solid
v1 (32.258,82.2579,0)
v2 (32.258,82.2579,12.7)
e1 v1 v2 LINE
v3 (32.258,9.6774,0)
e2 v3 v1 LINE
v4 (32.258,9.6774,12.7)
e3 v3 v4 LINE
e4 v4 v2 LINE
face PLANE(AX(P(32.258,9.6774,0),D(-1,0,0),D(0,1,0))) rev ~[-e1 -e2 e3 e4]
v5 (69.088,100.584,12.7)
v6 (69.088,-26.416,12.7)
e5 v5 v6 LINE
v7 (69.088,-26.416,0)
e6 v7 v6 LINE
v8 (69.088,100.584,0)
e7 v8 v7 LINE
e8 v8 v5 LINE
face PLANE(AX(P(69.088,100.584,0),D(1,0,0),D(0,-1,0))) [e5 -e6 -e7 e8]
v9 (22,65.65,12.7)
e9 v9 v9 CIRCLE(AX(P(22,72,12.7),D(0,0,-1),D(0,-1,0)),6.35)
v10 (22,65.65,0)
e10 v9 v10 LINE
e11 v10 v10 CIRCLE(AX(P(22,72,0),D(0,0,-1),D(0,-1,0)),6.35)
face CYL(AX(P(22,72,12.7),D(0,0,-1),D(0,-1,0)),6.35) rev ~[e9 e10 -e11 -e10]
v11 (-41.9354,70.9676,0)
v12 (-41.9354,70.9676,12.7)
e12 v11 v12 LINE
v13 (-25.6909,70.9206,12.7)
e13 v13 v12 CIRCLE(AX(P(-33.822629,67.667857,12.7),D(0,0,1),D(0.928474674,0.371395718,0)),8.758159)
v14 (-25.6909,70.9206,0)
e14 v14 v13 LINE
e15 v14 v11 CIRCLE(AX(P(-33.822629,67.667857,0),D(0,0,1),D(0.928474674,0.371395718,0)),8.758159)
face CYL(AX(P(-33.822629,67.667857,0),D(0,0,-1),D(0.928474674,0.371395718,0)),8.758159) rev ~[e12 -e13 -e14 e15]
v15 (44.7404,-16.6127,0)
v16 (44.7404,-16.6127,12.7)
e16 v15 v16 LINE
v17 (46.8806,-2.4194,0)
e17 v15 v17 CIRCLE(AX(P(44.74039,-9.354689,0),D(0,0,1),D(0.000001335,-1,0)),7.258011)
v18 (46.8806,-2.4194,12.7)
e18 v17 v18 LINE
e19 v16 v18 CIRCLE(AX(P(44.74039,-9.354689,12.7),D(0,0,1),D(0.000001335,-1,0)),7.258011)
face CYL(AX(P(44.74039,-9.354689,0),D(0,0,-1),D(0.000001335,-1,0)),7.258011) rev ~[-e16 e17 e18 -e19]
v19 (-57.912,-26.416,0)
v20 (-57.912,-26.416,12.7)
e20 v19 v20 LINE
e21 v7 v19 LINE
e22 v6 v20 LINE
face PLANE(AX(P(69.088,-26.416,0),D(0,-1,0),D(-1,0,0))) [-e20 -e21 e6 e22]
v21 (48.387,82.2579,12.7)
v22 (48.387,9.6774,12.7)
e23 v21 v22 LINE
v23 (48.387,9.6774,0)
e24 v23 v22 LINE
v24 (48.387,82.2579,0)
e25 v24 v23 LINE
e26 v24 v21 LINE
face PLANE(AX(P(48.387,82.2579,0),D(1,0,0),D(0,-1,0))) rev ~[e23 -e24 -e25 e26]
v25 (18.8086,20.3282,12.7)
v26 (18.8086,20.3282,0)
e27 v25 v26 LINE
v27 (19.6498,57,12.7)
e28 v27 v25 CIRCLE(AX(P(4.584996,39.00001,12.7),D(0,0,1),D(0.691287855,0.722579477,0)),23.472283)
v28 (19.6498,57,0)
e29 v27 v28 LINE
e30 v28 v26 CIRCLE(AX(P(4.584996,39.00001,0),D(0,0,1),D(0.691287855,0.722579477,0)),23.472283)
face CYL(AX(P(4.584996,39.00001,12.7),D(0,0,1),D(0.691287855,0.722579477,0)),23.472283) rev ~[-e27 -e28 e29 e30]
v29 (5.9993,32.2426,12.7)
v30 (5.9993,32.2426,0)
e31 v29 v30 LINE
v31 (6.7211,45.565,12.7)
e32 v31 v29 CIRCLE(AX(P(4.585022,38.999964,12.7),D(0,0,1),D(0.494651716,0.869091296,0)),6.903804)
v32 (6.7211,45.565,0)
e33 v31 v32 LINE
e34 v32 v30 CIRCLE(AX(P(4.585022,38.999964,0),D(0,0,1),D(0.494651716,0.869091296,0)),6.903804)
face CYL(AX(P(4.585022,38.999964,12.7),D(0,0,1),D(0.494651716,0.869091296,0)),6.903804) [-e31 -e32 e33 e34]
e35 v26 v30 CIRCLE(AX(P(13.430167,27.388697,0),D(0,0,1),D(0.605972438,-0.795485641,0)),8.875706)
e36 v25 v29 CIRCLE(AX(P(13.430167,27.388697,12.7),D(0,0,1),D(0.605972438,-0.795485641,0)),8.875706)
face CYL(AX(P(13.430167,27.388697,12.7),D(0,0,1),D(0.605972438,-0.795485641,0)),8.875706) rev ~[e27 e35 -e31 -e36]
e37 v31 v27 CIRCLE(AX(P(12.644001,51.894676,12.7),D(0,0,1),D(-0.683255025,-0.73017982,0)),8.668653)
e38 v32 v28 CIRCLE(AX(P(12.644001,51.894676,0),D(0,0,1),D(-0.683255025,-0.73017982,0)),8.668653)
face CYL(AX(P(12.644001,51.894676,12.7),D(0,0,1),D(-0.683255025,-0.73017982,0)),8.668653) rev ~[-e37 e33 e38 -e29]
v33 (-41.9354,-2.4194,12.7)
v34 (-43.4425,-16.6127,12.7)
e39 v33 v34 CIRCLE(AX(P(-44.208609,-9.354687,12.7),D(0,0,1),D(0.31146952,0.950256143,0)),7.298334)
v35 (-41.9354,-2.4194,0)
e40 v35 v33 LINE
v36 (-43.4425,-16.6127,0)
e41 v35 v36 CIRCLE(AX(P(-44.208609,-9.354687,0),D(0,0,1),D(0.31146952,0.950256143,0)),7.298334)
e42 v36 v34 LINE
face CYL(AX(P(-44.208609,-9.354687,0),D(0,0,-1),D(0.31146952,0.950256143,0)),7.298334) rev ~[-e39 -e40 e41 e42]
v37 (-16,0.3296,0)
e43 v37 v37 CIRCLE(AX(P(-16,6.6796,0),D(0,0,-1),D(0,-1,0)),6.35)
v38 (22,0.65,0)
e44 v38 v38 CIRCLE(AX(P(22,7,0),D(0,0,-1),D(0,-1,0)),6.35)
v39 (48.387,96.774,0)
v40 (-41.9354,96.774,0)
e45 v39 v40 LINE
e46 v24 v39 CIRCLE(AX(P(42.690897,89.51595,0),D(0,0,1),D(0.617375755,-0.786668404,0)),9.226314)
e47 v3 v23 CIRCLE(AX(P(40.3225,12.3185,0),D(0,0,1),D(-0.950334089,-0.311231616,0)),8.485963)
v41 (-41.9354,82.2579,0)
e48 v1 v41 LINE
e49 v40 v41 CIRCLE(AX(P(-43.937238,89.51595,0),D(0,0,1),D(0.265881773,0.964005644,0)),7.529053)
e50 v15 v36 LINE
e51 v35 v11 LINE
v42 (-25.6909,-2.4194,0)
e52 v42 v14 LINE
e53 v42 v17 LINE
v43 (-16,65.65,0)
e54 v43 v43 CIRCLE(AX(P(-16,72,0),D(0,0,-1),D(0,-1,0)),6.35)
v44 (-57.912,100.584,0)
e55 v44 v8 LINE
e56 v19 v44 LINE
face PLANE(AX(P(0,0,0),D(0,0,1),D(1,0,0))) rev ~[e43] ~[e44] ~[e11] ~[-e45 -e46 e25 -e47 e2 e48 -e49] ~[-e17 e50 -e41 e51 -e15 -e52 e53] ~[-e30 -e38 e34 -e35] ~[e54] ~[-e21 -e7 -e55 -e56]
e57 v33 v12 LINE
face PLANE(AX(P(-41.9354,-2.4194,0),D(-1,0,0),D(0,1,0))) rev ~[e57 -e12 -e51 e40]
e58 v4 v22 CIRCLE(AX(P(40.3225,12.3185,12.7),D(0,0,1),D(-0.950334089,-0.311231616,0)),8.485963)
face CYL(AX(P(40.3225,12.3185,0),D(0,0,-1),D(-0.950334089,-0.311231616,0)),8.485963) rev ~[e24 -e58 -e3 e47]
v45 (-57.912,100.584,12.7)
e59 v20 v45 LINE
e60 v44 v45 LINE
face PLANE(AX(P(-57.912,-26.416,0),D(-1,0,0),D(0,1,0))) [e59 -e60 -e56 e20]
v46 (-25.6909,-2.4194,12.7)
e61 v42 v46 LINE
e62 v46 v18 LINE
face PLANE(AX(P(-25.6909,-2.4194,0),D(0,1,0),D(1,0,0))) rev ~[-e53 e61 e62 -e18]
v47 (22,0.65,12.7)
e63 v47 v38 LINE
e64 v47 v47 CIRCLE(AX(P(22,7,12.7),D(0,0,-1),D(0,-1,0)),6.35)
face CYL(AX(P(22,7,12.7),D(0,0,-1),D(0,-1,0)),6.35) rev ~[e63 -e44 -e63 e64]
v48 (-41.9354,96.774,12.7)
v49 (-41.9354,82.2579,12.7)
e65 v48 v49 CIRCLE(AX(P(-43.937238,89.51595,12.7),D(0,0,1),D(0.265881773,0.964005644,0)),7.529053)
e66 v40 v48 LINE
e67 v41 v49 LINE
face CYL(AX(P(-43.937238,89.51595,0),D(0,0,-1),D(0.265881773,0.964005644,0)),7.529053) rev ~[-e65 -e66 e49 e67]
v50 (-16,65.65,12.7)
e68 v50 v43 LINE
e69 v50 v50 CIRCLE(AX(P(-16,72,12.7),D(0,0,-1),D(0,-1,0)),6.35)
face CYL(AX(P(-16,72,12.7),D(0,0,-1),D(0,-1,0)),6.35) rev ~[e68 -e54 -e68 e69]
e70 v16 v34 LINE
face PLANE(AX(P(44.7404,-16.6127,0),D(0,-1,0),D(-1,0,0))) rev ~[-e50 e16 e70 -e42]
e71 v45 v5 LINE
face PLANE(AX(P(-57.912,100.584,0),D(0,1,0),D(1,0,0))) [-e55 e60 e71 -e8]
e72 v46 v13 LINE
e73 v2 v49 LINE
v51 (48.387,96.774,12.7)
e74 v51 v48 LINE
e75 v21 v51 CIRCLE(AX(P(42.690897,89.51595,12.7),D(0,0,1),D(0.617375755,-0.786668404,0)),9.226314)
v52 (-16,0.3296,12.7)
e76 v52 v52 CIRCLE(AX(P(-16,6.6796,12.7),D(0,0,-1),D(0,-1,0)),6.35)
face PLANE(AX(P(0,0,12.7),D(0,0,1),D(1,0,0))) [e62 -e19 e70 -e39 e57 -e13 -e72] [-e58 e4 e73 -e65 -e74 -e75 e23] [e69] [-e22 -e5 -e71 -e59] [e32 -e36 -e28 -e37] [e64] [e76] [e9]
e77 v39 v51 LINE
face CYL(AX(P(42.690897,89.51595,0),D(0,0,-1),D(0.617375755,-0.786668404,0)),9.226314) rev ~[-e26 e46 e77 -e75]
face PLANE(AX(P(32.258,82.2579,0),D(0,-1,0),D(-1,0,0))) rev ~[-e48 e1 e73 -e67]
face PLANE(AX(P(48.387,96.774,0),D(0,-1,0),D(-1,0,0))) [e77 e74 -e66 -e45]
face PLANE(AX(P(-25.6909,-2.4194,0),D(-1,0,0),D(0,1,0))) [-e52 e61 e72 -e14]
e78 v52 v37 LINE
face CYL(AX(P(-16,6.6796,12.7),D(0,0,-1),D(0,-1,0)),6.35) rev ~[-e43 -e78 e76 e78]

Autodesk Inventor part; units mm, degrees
ref_plane "YZ Plane" through (0, 0, 0) normal (1, 0, 0) x (0, 1, 0)
ref_plane "XZ Plane" through (0, 0, 0) normal (0, 1, 0) x (-1, 0, 0)
ref_plane "XY Plane" through (0, 0, 0) normal (0, 0, 1) x (1, 0, 0)
sketch "Sketch1" plane through (0, 0, 0) normal (0, 0, 1) x (1, 0, 0)
  line L0 (44.7404, -16.6127) -> (-43.4425, -16.6127)
  arc A0 (44.7404, -16.6127) -> (46.8806, -2.4194) centre (44.7404, -9.3547) ccw
  arc A1 (-41.9354, -2.4194) -> (-43.4425, -16.6127) centre (-44.2086, -9.3547) ccw
  line L1 (48.387, 82.2579) -> (48.387, 9.6774)
  arc A2 (-25.6909, 70.9206) -> (-41.9354, 70.9676) centre (-33.8226, 67.6679) ccw
  line L2 (-41.9354, -2.4194) -> (-41.9354, 70.9676)
  line L3 (-25.6909, -2.4194) -> (-25.6909, 70.9206)
  line L4 (-25.6909, -2.4194) -> (46.8806, -2.4194)
  line L5 (-57.912, 100.584) -> (69.088, 100.584)
  line L6 (69.088, 100.584) -> (69.088, -26.416)
  line L7 (69.088, -26.416) -> (-57.912, -26.416)
  line L8 (-57.912, -26.416) -> (-57.912, 100.584)
  arc A3 (32.258, 9.6774) -> (48.387, 9.6774) centre (40.3225, 12.3185) ccw
  arc A4 (48.387, 82.2579) -> (48.387, 96.774) centre (42.691, 89.5159) ccw
  line L9 (32.258, 82.2579) -> (-41.9354, 82.2579)
  line L10 (48.387, 96.774) -> (-41.9354, 96.774)
  line L11 (32.258, 9.6774) -> (32.258, 82.2579)
  arc A5 (-41.9354, 96.774) -> (-41.9354, 82.2579) centre (-43.9372, 89.5159) ccw
  point P0 (0, 0)
  dimension "d0" = 127
  dimension "d1" = 127
extrude "Extrusion1" add sketch "Sketch1" along normal blind 12.7
sketch "Sketch2" plane through (0, 0, 12.7) normal (0, 0, 1) x (1, 0, 0)
  circle A0 centre (22, 7) radius 6.35
  circle A1 centre (-16, 6.6796) radius 6.35
  circle A2 centre (-16, 72) radius 6.35
  circle A3 centre (22, 72) radius 6.35
  point P0 (0, 0)
  dimension "d4" = 12.7
  dimension "d5" = 12.7
  dimension "d6" = 12.7
  dimension "d7" = 12.7
hole "Hole1" at (-16, 6.6796, 12.7) at (22, 72, 12.7) at (-16, 72, 12.7) at (22, 7, 12.7) direction (0, 0, -1) diameter 12.7 end through all
sketch "Sketch3" plane through (0, 0, 12.7) normal (0, 0, 1) x (1, 0, 0)
  arc A0 (20.8111, 55.9606) -> (21.1932, 22.4134) centre (4.585, 39) ccw
  arc A1 (8, 45) -> (8.4788, 33.299) centre (4.585, 39) ccw
  arc A2 (6.7211, 45.565) -> (19.6498, 57) centre (12.644, 51.8946) ccw
  arc A3 (18.8086, 20.3282) -> (5.9993, 32.2426) centre (13.4301, 27.3887) ccw
  circle A4 centre (-16, 72) radius 6.35 projected
  circle A5 centre (-16, 6.6796) radius 6.35 projected
  circle A6 centre (22, 72) radius 6.35 projected
  circle A7 centre (22, 7) radius 6.35 projected
  arc A8 (48.387, 82.2579) -> (48.387, 96.774) centre (42.691, 89.5159) ccw projected
  line L0 (48.387, 82.2579) -> (48.387, 9.6774) projected
  arc A9 (32.258, 9.6774) -> (48.387, 9.6774) centre (40.3225, 12.3185) ccw projected
  line L1 (32.258, 9.6774) -> (32.258, 82.2579) projected
  line L2 (32.258, 82.2579) -> (-41.9354, 82.2579) projected
  arc A10 (-41.9354, 96.774) -> (-41.9354, 82.2579) centre (-43.9372, 89.5159) ccw projected
  line L3 (-41.9354, 96.774) -> (48.387, 96.774) projected
  arc A11 (-41.9354, -2.4194) -> (-43.4425, -16.6127) centre (-44.2086, -9.3547) ccw projected
  line L4 (-41.9354, -2.4194) -> (-41.9354, 70.9676) projected
  arc A12 (-25.6909, 70.9206) -> (-41.9354, 70.9676) centre (-33.8226, 67.6679) ccw projected
  line L5 (-25.6909, 70.9206) -> (-25.6909, -2.4194) projected
  line L6 (-25.6909, -2.4194) -> (46.8806, -2.4194) projected
  arc A13 (44.7404, -16.6127) -> (46.8806, -2.4194) centre (44.7404, -9.3547) ccw projected
  line L7 (44.7404, -16.6127) -> (-43.4425, -16.6127) projected
  line L8 (69.088, 100.584) -> (-57.912, 100.584) projected
  line L9 (-57.912, 100.584) -> (-57.912, -26.416) projected
  line L10 (-57.912, -26.416) -> (69.088, -26.416) projected
  line L11 (69.088, -26.416) -> (69.088, 100.584) projected
  point P0 (0, 0)
  point P1 (20.2164, 21.4898)
  point P2 (20.9887, 55.7889)
emboss "Emboss1" sketch "Sketch3" operation cut depth 12.7 direction (0, 0, -1) contours A2 A1 A3 A0
properties part number "newnameC" material "Polyethylene, High Density"
